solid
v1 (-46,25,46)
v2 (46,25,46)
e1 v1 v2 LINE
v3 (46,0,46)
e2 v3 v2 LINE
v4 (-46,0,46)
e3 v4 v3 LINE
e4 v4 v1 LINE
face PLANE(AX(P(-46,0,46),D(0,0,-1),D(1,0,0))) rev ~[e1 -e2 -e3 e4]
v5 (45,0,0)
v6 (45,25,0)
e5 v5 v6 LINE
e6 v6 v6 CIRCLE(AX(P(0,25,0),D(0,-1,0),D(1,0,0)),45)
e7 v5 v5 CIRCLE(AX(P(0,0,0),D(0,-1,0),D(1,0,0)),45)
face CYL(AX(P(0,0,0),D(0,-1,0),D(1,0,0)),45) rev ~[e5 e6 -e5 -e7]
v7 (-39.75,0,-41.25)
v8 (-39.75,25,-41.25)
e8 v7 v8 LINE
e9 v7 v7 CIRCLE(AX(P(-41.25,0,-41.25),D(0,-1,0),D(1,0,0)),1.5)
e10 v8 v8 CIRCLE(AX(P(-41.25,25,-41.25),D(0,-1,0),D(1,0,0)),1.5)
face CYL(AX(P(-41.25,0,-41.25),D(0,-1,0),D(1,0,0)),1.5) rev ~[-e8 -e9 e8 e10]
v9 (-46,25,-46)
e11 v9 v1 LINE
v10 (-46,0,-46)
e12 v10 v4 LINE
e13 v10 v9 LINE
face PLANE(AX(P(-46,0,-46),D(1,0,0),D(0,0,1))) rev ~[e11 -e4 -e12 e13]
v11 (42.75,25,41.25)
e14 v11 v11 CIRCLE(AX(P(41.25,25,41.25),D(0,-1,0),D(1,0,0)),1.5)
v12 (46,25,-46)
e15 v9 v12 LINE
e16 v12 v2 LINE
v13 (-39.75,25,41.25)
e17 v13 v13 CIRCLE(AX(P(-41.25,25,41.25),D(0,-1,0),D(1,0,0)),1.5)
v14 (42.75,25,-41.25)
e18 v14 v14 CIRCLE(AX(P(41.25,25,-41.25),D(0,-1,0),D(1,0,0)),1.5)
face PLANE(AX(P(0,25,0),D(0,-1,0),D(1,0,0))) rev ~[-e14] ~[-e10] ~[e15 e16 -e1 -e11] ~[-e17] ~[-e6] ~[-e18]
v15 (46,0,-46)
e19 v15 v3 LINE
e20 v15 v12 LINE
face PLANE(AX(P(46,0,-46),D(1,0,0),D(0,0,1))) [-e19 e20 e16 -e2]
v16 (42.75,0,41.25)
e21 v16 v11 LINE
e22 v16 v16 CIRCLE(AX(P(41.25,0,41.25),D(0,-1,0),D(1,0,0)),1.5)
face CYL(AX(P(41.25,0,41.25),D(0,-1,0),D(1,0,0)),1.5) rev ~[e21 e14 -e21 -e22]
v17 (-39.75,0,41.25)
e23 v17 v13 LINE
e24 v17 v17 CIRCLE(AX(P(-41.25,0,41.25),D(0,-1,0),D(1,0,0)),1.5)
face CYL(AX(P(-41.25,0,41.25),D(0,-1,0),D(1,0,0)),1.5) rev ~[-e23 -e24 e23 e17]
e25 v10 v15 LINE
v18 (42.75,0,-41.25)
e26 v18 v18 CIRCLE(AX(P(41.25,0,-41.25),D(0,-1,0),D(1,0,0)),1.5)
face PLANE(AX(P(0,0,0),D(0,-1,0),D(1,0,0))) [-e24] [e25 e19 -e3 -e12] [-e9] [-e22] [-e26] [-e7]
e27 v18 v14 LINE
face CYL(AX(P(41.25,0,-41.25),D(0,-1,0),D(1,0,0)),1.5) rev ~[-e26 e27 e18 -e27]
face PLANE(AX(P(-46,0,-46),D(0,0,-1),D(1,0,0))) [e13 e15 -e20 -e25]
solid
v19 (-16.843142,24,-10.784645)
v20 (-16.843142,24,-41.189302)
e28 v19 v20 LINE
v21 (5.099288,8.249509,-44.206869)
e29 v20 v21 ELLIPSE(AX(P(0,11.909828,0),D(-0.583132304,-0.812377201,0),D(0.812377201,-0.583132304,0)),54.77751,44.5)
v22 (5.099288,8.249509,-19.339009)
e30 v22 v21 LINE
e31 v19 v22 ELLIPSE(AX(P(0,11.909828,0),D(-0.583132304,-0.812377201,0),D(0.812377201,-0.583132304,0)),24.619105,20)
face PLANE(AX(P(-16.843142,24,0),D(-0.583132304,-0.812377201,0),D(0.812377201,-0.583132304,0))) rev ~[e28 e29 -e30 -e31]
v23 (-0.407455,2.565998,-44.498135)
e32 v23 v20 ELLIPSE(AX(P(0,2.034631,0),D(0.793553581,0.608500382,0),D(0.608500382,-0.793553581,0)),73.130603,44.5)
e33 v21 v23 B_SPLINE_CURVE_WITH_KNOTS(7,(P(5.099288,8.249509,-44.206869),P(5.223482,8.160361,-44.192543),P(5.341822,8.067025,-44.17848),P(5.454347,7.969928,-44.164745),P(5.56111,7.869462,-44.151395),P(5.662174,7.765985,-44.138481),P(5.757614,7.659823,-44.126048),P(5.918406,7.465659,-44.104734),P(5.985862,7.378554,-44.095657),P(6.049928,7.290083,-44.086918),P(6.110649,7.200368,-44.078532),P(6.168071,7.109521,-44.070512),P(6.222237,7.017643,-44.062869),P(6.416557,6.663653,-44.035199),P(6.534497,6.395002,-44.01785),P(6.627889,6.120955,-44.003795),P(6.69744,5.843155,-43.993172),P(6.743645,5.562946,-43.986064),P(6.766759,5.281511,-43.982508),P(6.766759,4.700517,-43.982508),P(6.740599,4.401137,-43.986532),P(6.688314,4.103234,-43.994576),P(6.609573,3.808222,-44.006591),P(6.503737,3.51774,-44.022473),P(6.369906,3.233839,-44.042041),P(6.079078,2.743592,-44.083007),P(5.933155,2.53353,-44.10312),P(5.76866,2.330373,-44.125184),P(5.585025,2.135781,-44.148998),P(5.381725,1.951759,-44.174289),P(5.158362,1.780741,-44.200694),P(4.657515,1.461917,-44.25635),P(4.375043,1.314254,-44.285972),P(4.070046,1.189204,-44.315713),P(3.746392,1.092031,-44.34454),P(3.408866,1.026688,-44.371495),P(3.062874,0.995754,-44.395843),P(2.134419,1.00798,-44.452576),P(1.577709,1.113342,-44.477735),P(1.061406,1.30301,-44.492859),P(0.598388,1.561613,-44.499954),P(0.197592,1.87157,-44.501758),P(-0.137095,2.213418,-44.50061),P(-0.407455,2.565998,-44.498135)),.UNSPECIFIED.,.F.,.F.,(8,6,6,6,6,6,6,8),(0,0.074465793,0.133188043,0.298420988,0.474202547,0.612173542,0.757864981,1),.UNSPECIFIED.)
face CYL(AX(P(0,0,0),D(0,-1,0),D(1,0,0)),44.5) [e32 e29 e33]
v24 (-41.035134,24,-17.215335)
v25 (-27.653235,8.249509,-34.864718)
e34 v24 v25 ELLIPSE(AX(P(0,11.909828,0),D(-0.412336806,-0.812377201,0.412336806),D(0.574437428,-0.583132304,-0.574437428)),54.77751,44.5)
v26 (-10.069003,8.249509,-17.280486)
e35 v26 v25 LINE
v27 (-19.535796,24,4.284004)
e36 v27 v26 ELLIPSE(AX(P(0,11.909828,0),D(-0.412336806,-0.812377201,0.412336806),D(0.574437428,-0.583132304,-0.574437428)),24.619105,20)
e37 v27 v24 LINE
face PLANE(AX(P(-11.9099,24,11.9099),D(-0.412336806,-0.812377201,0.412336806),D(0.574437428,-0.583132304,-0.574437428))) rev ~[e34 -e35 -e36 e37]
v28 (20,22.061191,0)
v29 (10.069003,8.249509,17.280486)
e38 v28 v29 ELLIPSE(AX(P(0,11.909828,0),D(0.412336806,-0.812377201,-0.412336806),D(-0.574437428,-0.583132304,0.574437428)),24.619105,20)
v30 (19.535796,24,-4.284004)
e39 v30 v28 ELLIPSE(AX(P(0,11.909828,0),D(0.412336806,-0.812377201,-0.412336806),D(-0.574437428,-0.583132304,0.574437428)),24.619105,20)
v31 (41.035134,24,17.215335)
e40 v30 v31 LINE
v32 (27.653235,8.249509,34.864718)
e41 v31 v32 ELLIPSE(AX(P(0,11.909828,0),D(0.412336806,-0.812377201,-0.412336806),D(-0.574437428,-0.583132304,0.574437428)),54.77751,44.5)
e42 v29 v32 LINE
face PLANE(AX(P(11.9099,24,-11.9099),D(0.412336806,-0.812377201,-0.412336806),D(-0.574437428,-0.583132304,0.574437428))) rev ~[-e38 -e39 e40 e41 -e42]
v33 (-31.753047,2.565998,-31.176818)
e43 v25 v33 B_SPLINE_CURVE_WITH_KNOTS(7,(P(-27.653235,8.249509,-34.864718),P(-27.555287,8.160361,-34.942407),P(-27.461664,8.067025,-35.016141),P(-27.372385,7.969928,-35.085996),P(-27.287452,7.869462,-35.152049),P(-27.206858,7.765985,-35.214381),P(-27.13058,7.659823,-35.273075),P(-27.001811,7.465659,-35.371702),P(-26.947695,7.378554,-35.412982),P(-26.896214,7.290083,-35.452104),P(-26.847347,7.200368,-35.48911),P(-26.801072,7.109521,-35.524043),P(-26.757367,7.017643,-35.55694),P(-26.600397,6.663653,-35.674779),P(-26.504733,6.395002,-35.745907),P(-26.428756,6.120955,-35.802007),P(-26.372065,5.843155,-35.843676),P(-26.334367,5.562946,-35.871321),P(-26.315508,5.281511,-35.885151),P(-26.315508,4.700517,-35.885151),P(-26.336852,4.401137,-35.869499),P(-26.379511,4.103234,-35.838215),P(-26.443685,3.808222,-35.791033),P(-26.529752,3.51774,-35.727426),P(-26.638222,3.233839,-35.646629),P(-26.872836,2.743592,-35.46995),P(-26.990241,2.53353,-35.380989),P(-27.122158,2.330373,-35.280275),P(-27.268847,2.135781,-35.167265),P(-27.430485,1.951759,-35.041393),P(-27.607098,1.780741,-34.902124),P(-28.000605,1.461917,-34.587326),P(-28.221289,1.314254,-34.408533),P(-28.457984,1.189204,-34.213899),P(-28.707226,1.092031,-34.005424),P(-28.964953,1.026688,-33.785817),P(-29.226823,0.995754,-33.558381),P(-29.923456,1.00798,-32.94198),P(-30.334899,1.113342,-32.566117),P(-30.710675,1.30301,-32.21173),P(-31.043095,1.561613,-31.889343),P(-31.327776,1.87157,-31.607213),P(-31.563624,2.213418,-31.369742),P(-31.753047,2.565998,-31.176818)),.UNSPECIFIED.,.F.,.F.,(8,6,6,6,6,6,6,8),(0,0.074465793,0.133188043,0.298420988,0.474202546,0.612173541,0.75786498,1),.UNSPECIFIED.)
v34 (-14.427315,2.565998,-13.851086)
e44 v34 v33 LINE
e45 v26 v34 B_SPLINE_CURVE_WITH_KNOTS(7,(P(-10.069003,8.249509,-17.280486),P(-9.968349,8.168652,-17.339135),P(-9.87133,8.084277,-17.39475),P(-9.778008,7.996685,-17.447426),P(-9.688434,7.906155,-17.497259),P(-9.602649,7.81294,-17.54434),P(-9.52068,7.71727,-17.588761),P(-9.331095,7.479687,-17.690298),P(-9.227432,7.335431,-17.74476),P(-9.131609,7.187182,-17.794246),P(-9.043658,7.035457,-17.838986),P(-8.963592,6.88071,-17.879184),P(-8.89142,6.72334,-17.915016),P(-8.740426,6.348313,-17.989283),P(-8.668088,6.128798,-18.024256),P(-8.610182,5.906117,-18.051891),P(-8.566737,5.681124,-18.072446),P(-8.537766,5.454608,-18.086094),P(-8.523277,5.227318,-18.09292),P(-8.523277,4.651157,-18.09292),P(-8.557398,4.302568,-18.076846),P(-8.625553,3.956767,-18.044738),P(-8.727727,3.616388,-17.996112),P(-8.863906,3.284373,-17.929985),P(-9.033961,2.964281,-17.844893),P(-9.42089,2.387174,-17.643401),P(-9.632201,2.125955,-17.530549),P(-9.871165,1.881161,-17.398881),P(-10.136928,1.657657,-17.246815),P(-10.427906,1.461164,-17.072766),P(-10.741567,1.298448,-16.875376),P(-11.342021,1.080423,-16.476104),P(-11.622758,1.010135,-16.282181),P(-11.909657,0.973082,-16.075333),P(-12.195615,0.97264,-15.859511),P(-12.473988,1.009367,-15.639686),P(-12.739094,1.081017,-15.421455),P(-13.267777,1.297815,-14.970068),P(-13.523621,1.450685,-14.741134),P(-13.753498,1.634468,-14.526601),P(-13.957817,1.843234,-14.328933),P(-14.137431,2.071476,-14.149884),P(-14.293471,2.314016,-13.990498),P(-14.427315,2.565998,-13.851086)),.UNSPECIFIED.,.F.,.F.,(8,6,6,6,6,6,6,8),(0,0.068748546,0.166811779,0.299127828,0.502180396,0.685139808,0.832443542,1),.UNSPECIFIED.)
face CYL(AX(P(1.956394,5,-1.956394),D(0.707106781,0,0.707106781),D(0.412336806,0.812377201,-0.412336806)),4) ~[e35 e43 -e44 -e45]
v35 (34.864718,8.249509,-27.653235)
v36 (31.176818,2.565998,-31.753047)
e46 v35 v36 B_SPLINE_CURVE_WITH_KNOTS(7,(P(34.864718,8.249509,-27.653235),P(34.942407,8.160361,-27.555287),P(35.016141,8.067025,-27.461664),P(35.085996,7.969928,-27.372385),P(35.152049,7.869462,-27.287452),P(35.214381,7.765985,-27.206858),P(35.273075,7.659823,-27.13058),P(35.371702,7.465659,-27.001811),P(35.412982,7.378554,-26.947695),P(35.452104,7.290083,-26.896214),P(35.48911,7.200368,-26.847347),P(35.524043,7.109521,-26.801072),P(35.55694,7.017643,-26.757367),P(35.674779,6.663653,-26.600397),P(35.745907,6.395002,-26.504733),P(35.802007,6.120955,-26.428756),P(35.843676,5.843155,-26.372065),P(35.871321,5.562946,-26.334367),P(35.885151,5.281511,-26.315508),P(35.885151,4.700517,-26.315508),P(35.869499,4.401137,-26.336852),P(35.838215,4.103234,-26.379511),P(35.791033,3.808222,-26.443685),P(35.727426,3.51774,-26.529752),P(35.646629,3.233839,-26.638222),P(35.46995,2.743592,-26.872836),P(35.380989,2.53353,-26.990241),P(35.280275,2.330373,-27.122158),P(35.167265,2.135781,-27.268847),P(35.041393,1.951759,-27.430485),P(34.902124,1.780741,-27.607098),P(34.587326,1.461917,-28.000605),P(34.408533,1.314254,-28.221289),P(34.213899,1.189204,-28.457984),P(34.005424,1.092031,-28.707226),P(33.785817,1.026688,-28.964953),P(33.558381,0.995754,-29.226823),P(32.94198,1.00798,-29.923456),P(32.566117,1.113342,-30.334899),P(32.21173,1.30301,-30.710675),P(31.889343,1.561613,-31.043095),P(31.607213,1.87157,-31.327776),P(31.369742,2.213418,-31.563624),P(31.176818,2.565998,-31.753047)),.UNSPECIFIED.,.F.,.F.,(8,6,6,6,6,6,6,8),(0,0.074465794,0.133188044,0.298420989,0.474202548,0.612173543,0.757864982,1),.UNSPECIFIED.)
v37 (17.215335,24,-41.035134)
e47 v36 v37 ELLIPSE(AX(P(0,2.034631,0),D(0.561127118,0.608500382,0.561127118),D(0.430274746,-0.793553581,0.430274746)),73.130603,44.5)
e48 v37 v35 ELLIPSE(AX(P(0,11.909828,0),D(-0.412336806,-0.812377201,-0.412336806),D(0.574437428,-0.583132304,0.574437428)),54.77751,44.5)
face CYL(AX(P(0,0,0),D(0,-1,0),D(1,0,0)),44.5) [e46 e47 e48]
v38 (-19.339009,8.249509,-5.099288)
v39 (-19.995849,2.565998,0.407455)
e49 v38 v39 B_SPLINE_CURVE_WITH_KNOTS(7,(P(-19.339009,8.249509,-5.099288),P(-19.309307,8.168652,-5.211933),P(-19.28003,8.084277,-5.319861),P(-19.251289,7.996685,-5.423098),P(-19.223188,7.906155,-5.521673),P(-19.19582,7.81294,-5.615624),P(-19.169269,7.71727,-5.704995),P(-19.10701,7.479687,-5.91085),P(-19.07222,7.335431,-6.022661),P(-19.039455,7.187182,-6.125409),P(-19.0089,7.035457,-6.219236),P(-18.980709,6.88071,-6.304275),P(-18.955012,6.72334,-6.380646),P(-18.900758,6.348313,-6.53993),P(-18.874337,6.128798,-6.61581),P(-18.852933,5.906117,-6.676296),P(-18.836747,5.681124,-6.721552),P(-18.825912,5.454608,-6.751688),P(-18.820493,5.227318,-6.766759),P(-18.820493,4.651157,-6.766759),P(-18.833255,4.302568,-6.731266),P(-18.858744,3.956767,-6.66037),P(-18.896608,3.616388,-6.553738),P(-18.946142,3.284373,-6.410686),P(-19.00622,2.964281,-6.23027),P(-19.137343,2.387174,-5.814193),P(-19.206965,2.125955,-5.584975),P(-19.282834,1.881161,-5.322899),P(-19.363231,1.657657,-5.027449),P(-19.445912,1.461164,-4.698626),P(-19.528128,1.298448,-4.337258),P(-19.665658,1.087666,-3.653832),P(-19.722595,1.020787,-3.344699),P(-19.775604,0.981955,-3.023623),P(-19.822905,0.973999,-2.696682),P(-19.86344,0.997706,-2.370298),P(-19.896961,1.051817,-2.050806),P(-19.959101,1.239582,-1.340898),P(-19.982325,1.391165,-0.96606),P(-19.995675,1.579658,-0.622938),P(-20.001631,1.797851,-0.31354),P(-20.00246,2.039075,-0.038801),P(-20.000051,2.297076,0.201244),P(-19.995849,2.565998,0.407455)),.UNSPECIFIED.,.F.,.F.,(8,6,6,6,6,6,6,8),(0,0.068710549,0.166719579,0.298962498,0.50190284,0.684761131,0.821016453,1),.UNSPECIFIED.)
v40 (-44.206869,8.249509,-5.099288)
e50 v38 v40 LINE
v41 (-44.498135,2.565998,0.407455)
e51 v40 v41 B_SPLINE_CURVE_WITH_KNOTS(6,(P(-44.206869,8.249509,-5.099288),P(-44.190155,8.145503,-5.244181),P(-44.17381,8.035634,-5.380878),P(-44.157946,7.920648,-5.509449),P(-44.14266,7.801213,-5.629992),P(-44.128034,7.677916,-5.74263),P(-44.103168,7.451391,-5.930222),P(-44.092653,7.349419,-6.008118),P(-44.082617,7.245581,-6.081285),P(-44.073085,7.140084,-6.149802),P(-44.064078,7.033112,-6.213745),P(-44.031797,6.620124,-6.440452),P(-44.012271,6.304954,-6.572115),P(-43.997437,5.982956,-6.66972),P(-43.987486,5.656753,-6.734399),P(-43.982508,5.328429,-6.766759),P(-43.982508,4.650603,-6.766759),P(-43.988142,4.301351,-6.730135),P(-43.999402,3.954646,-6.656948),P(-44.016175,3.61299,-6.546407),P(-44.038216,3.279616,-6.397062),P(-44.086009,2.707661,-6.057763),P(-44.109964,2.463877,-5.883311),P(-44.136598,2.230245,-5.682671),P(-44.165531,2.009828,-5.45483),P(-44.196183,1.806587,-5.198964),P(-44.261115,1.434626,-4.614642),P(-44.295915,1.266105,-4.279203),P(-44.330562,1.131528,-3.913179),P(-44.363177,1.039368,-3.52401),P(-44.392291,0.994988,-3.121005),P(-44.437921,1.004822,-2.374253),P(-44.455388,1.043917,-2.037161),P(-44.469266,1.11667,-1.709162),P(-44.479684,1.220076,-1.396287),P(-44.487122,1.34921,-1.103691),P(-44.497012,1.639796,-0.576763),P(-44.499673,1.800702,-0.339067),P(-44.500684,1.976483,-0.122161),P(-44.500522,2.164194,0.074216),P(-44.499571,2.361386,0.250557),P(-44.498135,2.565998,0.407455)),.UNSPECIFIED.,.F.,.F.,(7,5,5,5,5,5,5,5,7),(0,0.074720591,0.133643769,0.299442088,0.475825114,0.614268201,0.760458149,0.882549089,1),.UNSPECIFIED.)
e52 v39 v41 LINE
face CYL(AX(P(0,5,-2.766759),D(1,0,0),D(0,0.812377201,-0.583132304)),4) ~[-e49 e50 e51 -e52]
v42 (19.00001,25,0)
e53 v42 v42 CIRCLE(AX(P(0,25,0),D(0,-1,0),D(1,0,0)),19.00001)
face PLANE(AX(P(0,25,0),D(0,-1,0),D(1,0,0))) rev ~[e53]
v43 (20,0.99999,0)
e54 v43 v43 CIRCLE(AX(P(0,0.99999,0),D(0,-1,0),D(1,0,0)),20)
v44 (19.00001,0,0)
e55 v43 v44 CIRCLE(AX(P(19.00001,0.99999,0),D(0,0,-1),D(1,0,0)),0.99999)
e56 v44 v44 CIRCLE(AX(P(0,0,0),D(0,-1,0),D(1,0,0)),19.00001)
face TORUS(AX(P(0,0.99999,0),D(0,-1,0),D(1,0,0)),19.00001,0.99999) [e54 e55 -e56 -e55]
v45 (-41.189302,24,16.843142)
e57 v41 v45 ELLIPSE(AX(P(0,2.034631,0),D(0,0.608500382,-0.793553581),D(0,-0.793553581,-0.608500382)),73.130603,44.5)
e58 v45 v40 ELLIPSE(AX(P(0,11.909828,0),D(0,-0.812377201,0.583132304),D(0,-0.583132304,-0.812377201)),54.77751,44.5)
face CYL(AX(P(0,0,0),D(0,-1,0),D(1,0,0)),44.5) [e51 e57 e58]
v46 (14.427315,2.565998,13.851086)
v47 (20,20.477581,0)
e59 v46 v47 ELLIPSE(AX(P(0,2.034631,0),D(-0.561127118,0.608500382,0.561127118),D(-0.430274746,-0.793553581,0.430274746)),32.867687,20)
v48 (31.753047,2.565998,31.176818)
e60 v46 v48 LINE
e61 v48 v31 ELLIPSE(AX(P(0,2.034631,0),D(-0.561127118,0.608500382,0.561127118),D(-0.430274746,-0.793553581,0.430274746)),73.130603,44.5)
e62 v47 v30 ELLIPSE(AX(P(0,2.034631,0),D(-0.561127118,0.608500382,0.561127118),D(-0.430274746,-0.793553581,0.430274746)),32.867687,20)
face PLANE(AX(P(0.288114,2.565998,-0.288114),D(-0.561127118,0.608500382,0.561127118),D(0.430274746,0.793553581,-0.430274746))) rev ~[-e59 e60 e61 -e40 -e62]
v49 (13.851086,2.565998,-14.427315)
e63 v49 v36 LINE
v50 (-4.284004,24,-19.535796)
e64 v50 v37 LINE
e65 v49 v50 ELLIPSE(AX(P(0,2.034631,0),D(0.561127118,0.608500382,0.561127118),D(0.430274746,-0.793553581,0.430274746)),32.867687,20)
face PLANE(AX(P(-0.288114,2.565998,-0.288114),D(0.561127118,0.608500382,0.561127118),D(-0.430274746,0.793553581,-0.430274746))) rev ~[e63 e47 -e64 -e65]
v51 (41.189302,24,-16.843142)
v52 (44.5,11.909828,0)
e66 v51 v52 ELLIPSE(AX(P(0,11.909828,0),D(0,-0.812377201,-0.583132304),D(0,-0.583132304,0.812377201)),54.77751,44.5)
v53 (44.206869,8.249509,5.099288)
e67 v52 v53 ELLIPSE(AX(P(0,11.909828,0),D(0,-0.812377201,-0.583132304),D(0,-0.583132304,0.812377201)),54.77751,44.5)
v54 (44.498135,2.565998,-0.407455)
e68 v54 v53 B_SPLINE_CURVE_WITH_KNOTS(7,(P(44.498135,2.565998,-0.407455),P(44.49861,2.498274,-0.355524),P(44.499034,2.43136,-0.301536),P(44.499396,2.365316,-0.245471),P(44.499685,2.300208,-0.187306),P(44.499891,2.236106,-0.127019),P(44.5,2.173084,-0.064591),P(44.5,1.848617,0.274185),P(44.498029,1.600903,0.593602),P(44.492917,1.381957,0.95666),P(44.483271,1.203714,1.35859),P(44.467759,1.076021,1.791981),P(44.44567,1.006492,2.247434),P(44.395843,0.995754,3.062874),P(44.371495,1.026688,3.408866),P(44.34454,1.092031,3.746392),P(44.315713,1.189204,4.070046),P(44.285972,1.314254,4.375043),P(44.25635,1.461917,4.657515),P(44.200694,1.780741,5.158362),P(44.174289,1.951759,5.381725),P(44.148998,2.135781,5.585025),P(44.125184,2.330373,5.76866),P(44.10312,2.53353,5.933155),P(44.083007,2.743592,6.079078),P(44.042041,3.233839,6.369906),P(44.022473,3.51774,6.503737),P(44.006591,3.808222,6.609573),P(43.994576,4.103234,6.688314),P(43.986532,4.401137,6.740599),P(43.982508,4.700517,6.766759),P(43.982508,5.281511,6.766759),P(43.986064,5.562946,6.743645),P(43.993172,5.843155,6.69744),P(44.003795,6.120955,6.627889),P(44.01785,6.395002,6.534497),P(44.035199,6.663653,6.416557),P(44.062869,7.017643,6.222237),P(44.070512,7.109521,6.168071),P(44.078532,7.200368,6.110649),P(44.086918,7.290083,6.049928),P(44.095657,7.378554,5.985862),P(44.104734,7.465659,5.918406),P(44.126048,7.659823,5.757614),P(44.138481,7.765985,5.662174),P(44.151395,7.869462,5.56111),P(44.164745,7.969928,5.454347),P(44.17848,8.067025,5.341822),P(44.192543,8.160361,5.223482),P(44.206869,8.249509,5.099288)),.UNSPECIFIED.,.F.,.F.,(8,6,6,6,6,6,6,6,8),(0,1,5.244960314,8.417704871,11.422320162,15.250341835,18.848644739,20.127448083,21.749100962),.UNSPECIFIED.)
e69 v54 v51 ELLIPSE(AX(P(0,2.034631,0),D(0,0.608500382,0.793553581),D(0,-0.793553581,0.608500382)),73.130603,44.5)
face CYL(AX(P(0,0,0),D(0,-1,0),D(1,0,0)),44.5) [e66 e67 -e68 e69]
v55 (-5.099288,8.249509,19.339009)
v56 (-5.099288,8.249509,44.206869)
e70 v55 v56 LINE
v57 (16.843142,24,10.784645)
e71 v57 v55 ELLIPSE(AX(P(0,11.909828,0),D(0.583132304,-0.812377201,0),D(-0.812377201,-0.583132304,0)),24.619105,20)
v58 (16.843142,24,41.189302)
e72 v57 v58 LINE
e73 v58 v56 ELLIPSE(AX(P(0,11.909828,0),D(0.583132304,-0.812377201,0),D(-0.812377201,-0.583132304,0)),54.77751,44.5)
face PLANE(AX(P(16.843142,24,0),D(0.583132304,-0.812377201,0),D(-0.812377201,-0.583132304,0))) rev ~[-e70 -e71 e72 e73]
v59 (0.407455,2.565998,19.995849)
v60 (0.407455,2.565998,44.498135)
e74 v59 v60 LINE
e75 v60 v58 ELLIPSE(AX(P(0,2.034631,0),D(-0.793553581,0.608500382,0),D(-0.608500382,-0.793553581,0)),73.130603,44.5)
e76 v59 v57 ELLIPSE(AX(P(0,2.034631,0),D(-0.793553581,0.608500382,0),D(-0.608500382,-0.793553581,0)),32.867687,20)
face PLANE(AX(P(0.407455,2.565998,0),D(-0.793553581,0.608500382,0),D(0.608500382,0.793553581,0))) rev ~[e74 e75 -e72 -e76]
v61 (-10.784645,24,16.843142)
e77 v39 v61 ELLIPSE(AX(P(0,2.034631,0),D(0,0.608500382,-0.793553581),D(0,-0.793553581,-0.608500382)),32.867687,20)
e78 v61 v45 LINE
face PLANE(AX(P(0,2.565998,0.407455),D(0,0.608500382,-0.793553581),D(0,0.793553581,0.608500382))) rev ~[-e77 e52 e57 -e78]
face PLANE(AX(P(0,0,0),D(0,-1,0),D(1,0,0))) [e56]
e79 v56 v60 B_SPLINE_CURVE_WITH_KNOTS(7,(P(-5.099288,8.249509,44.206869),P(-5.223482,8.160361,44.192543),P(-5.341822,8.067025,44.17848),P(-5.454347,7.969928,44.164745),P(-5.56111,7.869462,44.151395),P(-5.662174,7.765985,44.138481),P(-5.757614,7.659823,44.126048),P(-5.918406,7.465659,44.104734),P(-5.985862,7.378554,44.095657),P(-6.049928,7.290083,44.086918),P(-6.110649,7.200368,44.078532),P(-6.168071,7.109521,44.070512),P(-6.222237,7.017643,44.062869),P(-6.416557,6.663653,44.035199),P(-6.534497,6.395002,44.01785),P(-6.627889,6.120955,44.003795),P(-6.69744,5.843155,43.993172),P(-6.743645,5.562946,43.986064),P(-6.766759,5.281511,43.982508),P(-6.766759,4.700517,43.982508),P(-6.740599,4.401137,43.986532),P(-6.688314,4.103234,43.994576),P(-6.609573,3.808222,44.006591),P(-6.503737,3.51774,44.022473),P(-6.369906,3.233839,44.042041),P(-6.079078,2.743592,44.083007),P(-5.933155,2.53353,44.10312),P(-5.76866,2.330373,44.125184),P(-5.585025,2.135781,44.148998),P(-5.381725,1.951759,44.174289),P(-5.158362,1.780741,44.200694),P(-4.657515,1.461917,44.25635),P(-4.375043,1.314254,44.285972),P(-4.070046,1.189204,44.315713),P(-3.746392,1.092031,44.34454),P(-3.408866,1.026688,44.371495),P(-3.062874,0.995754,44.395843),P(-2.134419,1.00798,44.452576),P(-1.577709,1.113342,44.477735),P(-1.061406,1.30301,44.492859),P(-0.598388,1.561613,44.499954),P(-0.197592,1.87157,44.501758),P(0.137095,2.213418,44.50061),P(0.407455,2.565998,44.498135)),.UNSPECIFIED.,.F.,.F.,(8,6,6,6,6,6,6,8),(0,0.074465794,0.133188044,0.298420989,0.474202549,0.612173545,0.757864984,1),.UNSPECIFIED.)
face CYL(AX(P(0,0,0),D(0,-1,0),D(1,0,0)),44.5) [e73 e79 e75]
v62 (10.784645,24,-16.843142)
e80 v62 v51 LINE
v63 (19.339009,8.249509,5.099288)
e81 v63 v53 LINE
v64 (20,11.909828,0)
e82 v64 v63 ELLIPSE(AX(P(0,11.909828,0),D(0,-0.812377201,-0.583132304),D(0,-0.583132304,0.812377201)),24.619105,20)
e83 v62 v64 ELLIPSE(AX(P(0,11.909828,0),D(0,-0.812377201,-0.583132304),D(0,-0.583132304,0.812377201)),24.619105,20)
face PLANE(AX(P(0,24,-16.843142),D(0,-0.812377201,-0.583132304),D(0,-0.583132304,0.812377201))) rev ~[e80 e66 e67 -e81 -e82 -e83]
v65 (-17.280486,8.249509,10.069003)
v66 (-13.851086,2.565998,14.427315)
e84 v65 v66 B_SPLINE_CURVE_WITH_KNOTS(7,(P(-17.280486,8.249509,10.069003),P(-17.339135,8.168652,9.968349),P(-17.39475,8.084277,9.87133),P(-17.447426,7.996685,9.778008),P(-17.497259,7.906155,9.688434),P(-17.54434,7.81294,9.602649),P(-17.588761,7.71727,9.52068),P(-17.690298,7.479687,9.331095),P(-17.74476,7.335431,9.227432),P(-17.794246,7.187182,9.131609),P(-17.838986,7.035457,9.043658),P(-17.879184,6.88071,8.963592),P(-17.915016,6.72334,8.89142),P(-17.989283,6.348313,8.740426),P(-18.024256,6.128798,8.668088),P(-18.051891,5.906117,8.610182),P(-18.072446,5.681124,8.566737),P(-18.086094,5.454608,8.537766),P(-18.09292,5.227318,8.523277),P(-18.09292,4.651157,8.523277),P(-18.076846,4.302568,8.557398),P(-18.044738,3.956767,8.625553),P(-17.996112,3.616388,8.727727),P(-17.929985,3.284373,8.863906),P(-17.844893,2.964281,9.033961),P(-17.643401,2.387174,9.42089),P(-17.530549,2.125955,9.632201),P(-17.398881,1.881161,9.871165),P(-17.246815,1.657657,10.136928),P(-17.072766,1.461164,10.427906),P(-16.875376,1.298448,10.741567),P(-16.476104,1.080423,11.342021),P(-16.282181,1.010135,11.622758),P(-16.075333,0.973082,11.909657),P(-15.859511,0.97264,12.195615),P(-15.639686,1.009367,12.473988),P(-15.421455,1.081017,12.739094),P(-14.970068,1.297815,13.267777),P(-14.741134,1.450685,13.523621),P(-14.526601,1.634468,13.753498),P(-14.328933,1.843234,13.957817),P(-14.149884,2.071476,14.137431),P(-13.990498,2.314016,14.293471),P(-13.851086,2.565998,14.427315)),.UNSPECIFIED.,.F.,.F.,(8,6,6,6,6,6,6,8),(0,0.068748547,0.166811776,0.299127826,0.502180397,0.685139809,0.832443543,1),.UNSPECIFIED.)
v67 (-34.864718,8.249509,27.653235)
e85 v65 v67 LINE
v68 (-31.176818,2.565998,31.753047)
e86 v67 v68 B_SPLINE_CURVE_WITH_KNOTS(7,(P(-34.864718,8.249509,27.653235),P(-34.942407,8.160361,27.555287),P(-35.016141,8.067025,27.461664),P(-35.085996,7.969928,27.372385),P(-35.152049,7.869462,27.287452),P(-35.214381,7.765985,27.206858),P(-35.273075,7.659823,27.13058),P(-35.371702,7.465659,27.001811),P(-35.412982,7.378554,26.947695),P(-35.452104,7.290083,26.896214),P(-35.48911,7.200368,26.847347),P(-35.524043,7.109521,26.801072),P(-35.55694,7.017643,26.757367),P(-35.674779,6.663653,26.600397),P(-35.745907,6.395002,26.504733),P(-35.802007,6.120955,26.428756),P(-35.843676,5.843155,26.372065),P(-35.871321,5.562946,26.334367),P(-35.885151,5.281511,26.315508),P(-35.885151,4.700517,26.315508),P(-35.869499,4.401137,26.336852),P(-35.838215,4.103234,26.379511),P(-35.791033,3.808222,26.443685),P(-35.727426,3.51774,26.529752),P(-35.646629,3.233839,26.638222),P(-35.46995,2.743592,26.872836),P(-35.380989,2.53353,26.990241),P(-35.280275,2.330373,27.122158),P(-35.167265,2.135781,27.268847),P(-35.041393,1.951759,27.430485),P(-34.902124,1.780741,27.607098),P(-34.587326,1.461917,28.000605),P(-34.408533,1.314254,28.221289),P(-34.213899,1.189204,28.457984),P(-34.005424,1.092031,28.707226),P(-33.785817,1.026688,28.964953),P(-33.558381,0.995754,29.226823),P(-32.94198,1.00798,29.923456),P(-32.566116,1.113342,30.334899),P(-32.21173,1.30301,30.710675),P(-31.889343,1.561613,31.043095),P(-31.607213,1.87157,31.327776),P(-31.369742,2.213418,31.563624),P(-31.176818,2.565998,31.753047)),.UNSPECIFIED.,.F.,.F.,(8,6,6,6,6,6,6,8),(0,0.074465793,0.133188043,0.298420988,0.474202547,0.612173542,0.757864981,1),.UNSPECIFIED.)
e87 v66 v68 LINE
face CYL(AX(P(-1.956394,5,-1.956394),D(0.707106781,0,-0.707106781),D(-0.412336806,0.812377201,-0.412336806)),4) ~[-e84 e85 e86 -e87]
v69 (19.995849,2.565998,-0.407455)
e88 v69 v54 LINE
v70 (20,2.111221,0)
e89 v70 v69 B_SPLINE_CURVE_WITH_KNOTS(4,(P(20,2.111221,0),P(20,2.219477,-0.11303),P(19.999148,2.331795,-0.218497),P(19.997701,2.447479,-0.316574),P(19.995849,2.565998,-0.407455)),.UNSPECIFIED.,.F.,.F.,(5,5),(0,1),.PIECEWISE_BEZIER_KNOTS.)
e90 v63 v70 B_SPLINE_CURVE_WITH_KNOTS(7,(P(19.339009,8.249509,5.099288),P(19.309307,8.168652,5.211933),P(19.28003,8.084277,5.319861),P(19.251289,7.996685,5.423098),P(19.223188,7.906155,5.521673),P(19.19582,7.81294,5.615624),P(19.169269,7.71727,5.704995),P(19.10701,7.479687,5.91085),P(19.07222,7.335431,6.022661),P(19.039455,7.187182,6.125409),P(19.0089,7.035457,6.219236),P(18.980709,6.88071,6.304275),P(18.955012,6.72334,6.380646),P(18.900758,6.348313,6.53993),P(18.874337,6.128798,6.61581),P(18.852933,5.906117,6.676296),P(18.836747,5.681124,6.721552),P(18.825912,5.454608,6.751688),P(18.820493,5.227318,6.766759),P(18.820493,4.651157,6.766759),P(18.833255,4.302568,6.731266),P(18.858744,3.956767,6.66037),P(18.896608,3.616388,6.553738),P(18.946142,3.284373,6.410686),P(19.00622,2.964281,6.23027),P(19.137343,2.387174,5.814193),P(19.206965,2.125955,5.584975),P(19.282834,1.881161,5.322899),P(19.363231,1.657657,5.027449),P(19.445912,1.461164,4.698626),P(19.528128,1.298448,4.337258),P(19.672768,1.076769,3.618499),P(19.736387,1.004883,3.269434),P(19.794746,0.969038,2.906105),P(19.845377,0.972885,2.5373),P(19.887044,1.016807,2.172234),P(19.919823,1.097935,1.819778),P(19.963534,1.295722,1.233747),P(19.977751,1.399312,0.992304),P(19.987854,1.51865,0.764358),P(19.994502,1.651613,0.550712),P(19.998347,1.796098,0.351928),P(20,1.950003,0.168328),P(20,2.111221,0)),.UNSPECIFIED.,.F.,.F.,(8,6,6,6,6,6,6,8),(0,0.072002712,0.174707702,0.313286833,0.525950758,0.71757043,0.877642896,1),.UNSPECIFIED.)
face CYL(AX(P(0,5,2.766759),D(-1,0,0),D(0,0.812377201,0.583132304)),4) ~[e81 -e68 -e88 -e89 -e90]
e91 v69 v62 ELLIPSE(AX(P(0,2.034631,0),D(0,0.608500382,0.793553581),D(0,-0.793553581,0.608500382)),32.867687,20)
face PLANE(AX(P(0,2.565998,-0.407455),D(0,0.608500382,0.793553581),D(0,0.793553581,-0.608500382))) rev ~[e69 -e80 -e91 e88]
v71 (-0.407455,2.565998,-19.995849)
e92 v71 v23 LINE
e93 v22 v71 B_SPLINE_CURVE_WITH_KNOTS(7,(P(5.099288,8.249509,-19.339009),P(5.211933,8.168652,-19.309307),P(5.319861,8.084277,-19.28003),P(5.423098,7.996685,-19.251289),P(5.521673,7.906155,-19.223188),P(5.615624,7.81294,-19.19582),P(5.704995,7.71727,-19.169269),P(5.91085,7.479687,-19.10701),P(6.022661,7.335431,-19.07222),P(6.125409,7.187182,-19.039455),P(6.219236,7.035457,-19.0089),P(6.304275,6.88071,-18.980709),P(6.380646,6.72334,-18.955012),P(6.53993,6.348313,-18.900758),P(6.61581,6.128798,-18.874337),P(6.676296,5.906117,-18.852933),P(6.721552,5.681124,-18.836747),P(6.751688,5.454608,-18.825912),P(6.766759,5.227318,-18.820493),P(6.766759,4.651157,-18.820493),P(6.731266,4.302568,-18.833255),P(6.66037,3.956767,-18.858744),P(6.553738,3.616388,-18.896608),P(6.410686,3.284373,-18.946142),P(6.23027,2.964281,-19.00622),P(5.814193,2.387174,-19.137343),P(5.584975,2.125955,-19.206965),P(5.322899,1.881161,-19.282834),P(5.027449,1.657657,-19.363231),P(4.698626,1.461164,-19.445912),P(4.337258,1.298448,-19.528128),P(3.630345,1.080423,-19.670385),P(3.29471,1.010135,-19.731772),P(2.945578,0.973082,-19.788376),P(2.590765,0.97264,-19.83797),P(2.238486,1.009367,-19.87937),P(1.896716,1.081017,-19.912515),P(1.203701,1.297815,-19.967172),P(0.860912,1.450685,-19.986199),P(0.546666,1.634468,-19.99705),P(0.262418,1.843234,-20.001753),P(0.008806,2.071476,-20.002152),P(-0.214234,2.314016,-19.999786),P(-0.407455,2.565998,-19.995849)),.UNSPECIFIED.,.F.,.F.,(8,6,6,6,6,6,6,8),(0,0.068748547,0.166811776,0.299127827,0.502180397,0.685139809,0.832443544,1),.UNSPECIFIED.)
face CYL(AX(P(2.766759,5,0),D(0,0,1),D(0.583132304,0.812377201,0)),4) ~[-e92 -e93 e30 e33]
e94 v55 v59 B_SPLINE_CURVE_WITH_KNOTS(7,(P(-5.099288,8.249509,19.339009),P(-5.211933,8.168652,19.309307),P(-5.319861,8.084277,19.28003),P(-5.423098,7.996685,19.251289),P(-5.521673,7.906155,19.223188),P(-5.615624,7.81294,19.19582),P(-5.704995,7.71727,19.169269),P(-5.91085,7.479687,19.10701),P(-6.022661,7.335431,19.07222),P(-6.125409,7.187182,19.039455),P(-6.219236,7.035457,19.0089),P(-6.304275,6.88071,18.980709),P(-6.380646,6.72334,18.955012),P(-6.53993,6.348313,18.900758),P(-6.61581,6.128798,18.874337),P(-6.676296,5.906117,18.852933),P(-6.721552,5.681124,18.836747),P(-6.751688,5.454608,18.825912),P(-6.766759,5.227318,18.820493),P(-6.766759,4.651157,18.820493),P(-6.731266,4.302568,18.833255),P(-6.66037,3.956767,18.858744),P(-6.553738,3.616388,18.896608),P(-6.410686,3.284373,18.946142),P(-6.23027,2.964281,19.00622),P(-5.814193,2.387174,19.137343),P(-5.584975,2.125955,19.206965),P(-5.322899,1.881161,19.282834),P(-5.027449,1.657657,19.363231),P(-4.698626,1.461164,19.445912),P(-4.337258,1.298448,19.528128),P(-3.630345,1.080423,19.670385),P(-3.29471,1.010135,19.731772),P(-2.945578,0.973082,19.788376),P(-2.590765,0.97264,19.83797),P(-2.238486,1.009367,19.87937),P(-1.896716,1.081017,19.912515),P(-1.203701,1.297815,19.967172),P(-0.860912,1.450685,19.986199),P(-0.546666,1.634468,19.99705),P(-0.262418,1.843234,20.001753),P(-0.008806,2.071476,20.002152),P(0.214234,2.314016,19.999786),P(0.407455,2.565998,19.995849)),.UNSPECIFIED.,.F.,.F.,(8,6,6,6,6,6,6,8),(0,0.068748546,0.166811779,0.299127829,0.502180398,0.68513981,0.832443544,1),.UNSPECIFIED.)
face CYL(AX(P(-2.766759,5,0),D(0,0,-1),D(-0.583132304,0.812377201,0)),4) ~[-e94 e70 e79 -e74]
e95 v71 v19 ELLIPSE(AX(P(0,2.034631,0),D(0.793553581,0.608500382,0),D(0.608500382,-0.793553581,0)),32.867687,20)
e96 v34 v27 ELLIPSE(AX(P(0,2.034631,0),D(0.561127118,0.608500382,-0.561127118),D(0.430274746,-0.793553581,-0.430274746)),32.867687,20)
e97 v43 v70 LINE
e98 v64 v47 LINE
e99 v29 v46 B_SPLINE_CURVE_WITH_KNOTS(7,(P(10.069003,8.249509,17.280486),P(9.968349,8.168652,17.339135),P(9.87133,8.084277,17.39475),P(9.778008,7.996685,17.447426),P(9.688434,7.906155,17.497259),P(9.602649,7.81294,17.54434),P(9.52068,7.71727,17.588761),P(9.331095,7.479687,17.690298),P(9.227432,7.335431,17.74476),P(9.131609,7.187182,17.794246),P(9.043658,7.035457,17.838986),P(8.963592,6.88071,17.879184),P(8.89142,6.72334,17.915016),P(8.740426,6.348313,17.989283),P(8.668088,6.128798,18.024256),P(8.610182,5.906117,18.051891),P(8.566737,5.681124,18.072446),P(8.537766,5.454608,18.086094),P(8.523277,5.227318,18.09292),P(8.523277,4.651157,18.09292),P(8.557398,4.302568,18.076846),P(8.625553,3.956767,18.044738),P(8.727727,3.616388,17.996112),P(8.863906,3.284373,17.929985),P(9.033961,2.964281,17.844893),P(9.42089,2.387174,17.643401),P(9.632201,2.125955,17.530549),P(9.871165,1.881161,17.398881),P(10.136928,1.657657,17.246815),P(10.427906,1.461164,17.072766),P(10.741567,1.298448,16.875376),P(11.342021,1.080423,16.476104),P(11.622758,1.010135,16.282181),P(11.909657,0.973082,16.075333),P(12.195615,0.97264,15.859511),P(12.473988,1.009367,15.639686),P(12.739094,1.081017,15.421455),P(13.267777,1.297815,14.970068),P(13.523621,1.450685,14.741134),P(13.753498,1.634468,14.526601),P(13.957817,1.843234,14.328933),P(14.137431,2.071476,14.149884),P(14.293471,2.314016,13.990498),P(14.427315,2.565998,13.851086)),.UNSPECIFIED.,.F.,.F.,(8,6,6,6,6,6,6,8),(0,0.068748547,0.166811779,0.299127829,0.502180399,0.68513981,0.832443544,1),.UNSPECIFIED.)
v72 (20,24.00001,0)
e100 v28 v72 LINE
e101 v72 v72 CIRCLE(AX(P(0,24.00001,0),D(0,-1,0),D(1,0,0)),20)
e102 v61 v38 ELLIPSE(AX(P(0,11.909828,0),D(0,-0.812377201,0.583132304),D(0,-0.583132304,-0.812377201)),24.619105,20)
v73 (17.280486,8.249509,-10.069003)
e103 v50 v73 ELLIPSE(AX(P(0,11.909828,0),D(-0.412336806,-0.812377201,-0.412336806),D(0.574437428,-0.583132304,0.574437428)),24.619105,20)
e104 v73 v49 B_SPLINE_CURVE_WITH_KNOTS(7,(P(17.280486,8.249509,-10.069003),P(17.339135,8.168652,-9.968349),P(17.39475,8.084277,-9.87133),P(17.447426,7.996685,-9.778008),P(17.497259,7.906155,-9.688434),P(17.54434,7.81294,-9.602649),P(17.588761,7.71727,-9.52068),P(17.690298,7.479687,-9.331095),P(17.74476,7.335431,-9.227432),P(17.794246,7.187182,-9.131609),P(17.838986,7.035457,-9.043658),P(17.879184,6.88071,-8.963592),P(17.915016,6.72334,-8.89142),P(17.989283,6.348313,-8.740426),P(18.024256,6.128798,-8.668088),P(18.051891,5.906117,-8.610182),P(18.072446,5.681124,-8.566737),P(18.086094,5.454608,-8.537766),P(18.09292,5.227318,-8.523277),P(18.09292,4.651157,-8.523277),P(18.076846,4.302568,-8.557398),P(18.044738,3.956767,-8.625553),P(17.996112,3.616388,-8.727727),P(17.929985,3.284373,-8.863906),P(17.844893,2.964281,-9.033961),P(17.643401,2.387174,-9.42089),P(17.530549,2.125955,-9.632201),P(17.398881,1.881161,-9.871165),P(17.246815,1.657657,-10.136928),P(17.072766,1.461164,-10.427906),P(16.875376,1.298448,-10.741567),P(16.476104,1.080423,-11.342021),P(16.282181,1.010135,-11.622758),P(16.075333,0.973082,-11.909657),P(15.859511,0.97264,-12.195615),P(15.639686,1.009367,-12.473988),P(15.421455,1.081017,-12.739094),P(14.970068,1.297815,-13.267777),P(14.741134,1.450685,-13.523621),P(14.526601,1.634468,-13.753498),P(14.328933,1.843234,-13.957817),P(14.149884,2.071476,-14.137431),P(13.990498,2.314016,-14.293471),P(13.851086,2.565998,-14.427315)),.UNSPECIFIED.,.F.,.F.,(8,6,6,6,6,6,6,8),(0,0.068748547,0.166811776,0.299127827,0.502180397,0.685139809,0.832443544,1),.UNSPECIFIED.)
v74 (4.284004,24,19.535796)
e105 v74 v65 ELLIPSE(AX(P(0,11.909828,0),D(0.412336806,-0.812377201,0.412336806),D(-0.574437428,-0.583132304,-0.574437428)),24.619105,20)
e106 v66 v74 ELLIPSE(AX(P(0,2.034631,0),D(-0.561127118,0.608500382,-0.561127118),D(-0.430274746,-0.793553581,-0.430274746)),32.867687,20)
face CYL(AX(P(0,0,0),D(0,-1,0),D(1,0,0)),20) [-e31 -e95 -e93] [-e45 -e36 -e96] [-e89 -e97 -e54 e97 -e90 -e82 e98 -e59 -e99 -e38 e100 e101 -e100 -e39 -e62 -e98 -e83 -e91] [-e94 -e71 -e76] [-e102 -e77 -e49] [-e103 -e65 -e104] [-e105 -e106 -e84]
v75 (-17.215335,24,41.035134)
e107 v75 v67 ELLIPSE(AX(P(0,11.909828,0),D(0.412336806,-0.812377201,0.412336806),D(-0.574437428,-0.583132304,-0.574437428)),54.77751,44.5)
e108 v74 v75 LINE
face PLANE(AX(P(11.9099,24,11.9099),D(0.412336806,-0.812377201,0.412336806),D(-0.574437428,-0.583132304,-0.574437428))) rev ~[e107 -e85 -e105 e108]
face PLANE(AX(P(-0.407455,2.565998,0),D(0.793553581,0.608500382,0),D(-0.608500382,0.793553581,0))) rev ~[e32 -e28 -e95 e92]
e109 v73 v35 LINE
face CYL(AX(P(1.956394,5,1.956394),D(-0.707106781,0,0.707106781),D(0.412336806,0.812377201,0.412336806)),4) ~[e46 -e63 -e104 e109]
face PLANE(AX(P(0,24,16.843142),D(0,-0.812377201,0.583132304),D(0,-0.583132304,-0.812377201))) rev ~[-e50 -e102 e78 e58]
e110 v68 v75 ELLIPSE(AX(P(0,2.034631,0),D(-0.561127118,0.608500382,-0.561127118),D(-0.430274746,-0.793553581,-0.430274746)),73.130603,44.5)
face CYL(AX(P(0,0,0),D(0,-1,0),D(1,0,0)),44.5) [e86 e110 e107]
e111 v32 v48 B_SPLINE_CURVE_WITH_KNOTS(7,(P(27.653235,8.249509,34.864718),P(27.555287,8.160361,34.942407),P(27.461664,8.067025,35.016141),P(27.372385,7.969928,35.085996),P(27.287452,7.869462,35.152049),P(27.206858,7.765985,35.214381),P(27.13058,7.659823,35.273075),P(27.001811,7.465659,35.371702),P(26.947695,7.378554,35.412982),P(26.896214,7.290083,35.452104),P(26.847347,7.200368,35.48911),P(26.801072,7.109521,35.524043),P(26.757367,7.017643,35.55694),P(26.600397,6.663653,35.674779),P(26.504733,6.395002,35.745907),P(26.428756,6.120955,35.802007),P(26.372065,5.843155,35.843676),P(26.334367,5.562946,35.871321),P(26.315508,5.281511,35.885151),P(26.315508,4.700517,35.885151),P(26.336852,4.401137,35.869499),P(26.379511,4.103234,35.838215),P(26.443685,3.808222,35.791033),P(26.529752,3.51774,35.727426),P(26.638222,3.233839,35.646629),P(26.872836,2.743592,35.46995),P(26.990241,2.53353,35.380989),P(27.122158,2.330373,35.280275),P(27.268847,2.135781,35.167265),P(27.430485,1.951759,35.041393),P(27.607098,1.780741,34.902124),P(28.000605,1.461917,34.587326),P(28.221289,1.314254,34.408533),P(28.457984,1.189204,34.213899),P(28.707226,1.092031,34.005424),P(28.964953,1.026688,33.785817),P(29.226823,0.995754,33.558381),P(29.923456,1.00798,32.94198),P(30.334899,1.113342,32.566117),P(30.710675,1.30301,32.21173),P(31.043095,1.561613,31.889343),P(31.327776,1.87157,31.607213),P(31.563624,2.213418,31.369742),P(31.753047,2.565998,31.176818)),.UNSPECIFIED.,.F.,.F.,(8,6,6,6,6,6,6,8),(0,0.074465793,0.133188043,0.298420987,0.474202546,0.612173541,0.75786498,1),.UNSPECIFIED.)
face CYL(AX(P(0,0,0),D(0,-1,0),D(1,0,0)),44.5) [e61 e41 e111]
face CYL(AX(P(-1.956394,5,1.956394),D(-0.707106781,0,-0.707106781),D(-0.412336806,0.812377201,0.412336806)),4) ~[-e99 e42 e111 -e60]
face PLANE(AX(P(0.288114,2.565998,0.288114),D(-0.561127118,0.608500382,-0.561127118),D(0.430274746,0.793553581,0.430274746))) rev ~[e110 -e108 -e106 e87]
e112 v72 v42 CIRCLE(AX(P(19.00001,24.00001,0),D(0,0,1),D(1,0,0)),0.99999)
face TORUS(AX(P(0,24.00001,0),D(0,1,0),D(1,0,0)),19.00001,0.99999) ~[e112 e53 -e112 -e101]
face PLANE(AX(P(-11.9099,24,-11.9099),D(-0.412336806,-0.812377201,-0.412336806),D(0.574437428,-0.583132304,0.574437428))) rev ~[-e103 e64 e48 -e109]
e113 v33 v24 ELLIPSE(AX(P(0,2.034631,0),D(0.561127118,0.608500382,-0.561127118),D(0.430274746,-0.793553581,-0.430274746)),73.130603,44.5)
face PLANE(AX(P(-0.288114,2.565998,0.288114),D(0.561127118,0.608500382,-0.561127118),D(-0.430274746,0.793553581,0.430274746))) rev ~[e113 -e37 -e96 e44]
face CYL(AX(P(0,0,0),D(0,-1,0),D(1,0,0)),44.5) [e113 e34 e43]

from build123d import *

# Parameters (mm, degrees)
F0_W     = 92
F0_H     = 92
F0_R     = 1.5
F0_R_2   = 45
F1_DEPTH = 25
F3_DEPTH = 50
F4_COUNT = 8
F5_R     = 20
F6_DEPTH = 25
F7_W     = 120
F7_H     = 120
F7_R     = 44.5
F8_DEPTH = 25.0010001
F9_R     = 0.99999


# Not quite as in the source:
# - a fillet or chamfer is up to 0.001 mm smaller than in the source, because OpenCascade refuses the exact size


with BuildPart() as f1:
    # F0 (on Front) → F1 (new body)
    with BuildSketch(Plane.XZ):
        Rectangle(F0_W, F0_H)
        with Locations((-41.25, -41.25)):
            Circle(F0_R, mode=Mode.SUBTRACT)
        with Locations((41.25, -41.25)):
            Circle(F0_R, mode=Mode.SUBTRACT)
        with Locations((-41.25, 41.25)):
            Circle(F0_R, mode=Mode.SUBTRACT)
        Circle(F0_R_2, mode=Mode.SUBTRACT)
        with Locations((41.25, 41.25)):
            Circle(F0_R, mode=Mode.SUBTRACT)
    extrude(amount=-F1_DEPTH)


with BuildPart() as f3:
    # F2 (on Right) → F3 (new body)
    with BuildSketch(Plane.YZ):
        with BuildLine():
            ThreePointArc((8.2495088034, 5.0992883494), (2.2165993594, 5.6395071005), (2.5659984731, -0.4074551879))
            Line((2.5659984731, -0.4074551879), (24, -16.8431419879))
            Line((24, -16.8431419879), (8.2495088034, 5.0992883494))
        make_face()
    extrude(amount=F3_DEPTH)


with BuildPart() as f4_1:
    # F4: instance of F3
    add(f3.part.rotate(Axis((0, -8.8478960097, 0), (0, -1, 0)), 1 * 360 / F4_COUNT))


with BuildPart() as f4_2:
    # F4: instance of F3
    add(f3.part.rotate(Axis((0, -8.8478960097, 0), (0, -1, 0)), 2 * 360 / F4_COUNT))


with BuildPart() as f4_3:
    # F4: instance of F3
    add(f3.part.rotate(Axis((0, -8.8478960097, 0), (0, -1, 0)), 3 * 360 / F4_COUNT))


with BuildPart() as f4_4:
    # F4: instance of F3
    add(f3.part.rotate(Axis((0, -8.8478960097, 0), (0, -1, 0)), 4 * 360 / F4_COUNT))


with BuildPart() as f4_5:
    # F4: instance of F3
    add(f3.part.rotate(Axis((0, -8.8478960097, 0), (0, -1, 0)), 5 * 360 / F4_COUNT))


with BuildPart() as f4_6:
    # F4: instance of F3
    add(f3.part.rotate(Axis((0, -8.8478960097, 0), (0, -1, 0)), 6 * 360 / F4_COUNT))


with BuildPart() as f4_7:
    # F4: instance of F3
    add(f3.part.rotate(Axis((0, -8.8478960097, 0), (0, -1, 0)), 7 * 360 / F4_COUNT))


with BuildPart() as f3_1:
    add(f3.part)

    add(f4_1.part)  # F6 merges F4_1

    add(f4_2.part)  # F6 merges F4_2

    add(f4_3.part)  # F6 merges F4_3

    add(f4_4.part)  # F6 merges F4_4

    add(f4_5.part)  # F6 merges F4_5

    add(f4_6.part)  # F6 merges F4_6

    add(f4_7.part)  # F6 merges F4_7
    # F5 (on Front) → F6 (join)
    with BuildSketch(Plane.XZ):
        Circle(F5_R)
    extrude(amount=-F6_DEPTH)

    # F7 (on Front) → F8 (cut, through all)
    with BuildSketch(Plane.XZ):
        Rectangle(F7_W, F7_H)
        Circle(F7_R, mode=Mode.SUBTRACT)
    extrude(amount=-F8_DEPTH, mode=Mode.SUBTRACT)

    # F9 (radius 1 in the source; OpenCascade refuses exactly that, so slightly less here)
    f9_edges = [f3_1.edges().sort_by_distance(p)[0] for p in [
        (-20, 0, 0),
        (-20, 25, 0),
    ]]
    fillet(f9_edges, radius=F9_R)


solid = Compound([f1.part, f3_1.part])
